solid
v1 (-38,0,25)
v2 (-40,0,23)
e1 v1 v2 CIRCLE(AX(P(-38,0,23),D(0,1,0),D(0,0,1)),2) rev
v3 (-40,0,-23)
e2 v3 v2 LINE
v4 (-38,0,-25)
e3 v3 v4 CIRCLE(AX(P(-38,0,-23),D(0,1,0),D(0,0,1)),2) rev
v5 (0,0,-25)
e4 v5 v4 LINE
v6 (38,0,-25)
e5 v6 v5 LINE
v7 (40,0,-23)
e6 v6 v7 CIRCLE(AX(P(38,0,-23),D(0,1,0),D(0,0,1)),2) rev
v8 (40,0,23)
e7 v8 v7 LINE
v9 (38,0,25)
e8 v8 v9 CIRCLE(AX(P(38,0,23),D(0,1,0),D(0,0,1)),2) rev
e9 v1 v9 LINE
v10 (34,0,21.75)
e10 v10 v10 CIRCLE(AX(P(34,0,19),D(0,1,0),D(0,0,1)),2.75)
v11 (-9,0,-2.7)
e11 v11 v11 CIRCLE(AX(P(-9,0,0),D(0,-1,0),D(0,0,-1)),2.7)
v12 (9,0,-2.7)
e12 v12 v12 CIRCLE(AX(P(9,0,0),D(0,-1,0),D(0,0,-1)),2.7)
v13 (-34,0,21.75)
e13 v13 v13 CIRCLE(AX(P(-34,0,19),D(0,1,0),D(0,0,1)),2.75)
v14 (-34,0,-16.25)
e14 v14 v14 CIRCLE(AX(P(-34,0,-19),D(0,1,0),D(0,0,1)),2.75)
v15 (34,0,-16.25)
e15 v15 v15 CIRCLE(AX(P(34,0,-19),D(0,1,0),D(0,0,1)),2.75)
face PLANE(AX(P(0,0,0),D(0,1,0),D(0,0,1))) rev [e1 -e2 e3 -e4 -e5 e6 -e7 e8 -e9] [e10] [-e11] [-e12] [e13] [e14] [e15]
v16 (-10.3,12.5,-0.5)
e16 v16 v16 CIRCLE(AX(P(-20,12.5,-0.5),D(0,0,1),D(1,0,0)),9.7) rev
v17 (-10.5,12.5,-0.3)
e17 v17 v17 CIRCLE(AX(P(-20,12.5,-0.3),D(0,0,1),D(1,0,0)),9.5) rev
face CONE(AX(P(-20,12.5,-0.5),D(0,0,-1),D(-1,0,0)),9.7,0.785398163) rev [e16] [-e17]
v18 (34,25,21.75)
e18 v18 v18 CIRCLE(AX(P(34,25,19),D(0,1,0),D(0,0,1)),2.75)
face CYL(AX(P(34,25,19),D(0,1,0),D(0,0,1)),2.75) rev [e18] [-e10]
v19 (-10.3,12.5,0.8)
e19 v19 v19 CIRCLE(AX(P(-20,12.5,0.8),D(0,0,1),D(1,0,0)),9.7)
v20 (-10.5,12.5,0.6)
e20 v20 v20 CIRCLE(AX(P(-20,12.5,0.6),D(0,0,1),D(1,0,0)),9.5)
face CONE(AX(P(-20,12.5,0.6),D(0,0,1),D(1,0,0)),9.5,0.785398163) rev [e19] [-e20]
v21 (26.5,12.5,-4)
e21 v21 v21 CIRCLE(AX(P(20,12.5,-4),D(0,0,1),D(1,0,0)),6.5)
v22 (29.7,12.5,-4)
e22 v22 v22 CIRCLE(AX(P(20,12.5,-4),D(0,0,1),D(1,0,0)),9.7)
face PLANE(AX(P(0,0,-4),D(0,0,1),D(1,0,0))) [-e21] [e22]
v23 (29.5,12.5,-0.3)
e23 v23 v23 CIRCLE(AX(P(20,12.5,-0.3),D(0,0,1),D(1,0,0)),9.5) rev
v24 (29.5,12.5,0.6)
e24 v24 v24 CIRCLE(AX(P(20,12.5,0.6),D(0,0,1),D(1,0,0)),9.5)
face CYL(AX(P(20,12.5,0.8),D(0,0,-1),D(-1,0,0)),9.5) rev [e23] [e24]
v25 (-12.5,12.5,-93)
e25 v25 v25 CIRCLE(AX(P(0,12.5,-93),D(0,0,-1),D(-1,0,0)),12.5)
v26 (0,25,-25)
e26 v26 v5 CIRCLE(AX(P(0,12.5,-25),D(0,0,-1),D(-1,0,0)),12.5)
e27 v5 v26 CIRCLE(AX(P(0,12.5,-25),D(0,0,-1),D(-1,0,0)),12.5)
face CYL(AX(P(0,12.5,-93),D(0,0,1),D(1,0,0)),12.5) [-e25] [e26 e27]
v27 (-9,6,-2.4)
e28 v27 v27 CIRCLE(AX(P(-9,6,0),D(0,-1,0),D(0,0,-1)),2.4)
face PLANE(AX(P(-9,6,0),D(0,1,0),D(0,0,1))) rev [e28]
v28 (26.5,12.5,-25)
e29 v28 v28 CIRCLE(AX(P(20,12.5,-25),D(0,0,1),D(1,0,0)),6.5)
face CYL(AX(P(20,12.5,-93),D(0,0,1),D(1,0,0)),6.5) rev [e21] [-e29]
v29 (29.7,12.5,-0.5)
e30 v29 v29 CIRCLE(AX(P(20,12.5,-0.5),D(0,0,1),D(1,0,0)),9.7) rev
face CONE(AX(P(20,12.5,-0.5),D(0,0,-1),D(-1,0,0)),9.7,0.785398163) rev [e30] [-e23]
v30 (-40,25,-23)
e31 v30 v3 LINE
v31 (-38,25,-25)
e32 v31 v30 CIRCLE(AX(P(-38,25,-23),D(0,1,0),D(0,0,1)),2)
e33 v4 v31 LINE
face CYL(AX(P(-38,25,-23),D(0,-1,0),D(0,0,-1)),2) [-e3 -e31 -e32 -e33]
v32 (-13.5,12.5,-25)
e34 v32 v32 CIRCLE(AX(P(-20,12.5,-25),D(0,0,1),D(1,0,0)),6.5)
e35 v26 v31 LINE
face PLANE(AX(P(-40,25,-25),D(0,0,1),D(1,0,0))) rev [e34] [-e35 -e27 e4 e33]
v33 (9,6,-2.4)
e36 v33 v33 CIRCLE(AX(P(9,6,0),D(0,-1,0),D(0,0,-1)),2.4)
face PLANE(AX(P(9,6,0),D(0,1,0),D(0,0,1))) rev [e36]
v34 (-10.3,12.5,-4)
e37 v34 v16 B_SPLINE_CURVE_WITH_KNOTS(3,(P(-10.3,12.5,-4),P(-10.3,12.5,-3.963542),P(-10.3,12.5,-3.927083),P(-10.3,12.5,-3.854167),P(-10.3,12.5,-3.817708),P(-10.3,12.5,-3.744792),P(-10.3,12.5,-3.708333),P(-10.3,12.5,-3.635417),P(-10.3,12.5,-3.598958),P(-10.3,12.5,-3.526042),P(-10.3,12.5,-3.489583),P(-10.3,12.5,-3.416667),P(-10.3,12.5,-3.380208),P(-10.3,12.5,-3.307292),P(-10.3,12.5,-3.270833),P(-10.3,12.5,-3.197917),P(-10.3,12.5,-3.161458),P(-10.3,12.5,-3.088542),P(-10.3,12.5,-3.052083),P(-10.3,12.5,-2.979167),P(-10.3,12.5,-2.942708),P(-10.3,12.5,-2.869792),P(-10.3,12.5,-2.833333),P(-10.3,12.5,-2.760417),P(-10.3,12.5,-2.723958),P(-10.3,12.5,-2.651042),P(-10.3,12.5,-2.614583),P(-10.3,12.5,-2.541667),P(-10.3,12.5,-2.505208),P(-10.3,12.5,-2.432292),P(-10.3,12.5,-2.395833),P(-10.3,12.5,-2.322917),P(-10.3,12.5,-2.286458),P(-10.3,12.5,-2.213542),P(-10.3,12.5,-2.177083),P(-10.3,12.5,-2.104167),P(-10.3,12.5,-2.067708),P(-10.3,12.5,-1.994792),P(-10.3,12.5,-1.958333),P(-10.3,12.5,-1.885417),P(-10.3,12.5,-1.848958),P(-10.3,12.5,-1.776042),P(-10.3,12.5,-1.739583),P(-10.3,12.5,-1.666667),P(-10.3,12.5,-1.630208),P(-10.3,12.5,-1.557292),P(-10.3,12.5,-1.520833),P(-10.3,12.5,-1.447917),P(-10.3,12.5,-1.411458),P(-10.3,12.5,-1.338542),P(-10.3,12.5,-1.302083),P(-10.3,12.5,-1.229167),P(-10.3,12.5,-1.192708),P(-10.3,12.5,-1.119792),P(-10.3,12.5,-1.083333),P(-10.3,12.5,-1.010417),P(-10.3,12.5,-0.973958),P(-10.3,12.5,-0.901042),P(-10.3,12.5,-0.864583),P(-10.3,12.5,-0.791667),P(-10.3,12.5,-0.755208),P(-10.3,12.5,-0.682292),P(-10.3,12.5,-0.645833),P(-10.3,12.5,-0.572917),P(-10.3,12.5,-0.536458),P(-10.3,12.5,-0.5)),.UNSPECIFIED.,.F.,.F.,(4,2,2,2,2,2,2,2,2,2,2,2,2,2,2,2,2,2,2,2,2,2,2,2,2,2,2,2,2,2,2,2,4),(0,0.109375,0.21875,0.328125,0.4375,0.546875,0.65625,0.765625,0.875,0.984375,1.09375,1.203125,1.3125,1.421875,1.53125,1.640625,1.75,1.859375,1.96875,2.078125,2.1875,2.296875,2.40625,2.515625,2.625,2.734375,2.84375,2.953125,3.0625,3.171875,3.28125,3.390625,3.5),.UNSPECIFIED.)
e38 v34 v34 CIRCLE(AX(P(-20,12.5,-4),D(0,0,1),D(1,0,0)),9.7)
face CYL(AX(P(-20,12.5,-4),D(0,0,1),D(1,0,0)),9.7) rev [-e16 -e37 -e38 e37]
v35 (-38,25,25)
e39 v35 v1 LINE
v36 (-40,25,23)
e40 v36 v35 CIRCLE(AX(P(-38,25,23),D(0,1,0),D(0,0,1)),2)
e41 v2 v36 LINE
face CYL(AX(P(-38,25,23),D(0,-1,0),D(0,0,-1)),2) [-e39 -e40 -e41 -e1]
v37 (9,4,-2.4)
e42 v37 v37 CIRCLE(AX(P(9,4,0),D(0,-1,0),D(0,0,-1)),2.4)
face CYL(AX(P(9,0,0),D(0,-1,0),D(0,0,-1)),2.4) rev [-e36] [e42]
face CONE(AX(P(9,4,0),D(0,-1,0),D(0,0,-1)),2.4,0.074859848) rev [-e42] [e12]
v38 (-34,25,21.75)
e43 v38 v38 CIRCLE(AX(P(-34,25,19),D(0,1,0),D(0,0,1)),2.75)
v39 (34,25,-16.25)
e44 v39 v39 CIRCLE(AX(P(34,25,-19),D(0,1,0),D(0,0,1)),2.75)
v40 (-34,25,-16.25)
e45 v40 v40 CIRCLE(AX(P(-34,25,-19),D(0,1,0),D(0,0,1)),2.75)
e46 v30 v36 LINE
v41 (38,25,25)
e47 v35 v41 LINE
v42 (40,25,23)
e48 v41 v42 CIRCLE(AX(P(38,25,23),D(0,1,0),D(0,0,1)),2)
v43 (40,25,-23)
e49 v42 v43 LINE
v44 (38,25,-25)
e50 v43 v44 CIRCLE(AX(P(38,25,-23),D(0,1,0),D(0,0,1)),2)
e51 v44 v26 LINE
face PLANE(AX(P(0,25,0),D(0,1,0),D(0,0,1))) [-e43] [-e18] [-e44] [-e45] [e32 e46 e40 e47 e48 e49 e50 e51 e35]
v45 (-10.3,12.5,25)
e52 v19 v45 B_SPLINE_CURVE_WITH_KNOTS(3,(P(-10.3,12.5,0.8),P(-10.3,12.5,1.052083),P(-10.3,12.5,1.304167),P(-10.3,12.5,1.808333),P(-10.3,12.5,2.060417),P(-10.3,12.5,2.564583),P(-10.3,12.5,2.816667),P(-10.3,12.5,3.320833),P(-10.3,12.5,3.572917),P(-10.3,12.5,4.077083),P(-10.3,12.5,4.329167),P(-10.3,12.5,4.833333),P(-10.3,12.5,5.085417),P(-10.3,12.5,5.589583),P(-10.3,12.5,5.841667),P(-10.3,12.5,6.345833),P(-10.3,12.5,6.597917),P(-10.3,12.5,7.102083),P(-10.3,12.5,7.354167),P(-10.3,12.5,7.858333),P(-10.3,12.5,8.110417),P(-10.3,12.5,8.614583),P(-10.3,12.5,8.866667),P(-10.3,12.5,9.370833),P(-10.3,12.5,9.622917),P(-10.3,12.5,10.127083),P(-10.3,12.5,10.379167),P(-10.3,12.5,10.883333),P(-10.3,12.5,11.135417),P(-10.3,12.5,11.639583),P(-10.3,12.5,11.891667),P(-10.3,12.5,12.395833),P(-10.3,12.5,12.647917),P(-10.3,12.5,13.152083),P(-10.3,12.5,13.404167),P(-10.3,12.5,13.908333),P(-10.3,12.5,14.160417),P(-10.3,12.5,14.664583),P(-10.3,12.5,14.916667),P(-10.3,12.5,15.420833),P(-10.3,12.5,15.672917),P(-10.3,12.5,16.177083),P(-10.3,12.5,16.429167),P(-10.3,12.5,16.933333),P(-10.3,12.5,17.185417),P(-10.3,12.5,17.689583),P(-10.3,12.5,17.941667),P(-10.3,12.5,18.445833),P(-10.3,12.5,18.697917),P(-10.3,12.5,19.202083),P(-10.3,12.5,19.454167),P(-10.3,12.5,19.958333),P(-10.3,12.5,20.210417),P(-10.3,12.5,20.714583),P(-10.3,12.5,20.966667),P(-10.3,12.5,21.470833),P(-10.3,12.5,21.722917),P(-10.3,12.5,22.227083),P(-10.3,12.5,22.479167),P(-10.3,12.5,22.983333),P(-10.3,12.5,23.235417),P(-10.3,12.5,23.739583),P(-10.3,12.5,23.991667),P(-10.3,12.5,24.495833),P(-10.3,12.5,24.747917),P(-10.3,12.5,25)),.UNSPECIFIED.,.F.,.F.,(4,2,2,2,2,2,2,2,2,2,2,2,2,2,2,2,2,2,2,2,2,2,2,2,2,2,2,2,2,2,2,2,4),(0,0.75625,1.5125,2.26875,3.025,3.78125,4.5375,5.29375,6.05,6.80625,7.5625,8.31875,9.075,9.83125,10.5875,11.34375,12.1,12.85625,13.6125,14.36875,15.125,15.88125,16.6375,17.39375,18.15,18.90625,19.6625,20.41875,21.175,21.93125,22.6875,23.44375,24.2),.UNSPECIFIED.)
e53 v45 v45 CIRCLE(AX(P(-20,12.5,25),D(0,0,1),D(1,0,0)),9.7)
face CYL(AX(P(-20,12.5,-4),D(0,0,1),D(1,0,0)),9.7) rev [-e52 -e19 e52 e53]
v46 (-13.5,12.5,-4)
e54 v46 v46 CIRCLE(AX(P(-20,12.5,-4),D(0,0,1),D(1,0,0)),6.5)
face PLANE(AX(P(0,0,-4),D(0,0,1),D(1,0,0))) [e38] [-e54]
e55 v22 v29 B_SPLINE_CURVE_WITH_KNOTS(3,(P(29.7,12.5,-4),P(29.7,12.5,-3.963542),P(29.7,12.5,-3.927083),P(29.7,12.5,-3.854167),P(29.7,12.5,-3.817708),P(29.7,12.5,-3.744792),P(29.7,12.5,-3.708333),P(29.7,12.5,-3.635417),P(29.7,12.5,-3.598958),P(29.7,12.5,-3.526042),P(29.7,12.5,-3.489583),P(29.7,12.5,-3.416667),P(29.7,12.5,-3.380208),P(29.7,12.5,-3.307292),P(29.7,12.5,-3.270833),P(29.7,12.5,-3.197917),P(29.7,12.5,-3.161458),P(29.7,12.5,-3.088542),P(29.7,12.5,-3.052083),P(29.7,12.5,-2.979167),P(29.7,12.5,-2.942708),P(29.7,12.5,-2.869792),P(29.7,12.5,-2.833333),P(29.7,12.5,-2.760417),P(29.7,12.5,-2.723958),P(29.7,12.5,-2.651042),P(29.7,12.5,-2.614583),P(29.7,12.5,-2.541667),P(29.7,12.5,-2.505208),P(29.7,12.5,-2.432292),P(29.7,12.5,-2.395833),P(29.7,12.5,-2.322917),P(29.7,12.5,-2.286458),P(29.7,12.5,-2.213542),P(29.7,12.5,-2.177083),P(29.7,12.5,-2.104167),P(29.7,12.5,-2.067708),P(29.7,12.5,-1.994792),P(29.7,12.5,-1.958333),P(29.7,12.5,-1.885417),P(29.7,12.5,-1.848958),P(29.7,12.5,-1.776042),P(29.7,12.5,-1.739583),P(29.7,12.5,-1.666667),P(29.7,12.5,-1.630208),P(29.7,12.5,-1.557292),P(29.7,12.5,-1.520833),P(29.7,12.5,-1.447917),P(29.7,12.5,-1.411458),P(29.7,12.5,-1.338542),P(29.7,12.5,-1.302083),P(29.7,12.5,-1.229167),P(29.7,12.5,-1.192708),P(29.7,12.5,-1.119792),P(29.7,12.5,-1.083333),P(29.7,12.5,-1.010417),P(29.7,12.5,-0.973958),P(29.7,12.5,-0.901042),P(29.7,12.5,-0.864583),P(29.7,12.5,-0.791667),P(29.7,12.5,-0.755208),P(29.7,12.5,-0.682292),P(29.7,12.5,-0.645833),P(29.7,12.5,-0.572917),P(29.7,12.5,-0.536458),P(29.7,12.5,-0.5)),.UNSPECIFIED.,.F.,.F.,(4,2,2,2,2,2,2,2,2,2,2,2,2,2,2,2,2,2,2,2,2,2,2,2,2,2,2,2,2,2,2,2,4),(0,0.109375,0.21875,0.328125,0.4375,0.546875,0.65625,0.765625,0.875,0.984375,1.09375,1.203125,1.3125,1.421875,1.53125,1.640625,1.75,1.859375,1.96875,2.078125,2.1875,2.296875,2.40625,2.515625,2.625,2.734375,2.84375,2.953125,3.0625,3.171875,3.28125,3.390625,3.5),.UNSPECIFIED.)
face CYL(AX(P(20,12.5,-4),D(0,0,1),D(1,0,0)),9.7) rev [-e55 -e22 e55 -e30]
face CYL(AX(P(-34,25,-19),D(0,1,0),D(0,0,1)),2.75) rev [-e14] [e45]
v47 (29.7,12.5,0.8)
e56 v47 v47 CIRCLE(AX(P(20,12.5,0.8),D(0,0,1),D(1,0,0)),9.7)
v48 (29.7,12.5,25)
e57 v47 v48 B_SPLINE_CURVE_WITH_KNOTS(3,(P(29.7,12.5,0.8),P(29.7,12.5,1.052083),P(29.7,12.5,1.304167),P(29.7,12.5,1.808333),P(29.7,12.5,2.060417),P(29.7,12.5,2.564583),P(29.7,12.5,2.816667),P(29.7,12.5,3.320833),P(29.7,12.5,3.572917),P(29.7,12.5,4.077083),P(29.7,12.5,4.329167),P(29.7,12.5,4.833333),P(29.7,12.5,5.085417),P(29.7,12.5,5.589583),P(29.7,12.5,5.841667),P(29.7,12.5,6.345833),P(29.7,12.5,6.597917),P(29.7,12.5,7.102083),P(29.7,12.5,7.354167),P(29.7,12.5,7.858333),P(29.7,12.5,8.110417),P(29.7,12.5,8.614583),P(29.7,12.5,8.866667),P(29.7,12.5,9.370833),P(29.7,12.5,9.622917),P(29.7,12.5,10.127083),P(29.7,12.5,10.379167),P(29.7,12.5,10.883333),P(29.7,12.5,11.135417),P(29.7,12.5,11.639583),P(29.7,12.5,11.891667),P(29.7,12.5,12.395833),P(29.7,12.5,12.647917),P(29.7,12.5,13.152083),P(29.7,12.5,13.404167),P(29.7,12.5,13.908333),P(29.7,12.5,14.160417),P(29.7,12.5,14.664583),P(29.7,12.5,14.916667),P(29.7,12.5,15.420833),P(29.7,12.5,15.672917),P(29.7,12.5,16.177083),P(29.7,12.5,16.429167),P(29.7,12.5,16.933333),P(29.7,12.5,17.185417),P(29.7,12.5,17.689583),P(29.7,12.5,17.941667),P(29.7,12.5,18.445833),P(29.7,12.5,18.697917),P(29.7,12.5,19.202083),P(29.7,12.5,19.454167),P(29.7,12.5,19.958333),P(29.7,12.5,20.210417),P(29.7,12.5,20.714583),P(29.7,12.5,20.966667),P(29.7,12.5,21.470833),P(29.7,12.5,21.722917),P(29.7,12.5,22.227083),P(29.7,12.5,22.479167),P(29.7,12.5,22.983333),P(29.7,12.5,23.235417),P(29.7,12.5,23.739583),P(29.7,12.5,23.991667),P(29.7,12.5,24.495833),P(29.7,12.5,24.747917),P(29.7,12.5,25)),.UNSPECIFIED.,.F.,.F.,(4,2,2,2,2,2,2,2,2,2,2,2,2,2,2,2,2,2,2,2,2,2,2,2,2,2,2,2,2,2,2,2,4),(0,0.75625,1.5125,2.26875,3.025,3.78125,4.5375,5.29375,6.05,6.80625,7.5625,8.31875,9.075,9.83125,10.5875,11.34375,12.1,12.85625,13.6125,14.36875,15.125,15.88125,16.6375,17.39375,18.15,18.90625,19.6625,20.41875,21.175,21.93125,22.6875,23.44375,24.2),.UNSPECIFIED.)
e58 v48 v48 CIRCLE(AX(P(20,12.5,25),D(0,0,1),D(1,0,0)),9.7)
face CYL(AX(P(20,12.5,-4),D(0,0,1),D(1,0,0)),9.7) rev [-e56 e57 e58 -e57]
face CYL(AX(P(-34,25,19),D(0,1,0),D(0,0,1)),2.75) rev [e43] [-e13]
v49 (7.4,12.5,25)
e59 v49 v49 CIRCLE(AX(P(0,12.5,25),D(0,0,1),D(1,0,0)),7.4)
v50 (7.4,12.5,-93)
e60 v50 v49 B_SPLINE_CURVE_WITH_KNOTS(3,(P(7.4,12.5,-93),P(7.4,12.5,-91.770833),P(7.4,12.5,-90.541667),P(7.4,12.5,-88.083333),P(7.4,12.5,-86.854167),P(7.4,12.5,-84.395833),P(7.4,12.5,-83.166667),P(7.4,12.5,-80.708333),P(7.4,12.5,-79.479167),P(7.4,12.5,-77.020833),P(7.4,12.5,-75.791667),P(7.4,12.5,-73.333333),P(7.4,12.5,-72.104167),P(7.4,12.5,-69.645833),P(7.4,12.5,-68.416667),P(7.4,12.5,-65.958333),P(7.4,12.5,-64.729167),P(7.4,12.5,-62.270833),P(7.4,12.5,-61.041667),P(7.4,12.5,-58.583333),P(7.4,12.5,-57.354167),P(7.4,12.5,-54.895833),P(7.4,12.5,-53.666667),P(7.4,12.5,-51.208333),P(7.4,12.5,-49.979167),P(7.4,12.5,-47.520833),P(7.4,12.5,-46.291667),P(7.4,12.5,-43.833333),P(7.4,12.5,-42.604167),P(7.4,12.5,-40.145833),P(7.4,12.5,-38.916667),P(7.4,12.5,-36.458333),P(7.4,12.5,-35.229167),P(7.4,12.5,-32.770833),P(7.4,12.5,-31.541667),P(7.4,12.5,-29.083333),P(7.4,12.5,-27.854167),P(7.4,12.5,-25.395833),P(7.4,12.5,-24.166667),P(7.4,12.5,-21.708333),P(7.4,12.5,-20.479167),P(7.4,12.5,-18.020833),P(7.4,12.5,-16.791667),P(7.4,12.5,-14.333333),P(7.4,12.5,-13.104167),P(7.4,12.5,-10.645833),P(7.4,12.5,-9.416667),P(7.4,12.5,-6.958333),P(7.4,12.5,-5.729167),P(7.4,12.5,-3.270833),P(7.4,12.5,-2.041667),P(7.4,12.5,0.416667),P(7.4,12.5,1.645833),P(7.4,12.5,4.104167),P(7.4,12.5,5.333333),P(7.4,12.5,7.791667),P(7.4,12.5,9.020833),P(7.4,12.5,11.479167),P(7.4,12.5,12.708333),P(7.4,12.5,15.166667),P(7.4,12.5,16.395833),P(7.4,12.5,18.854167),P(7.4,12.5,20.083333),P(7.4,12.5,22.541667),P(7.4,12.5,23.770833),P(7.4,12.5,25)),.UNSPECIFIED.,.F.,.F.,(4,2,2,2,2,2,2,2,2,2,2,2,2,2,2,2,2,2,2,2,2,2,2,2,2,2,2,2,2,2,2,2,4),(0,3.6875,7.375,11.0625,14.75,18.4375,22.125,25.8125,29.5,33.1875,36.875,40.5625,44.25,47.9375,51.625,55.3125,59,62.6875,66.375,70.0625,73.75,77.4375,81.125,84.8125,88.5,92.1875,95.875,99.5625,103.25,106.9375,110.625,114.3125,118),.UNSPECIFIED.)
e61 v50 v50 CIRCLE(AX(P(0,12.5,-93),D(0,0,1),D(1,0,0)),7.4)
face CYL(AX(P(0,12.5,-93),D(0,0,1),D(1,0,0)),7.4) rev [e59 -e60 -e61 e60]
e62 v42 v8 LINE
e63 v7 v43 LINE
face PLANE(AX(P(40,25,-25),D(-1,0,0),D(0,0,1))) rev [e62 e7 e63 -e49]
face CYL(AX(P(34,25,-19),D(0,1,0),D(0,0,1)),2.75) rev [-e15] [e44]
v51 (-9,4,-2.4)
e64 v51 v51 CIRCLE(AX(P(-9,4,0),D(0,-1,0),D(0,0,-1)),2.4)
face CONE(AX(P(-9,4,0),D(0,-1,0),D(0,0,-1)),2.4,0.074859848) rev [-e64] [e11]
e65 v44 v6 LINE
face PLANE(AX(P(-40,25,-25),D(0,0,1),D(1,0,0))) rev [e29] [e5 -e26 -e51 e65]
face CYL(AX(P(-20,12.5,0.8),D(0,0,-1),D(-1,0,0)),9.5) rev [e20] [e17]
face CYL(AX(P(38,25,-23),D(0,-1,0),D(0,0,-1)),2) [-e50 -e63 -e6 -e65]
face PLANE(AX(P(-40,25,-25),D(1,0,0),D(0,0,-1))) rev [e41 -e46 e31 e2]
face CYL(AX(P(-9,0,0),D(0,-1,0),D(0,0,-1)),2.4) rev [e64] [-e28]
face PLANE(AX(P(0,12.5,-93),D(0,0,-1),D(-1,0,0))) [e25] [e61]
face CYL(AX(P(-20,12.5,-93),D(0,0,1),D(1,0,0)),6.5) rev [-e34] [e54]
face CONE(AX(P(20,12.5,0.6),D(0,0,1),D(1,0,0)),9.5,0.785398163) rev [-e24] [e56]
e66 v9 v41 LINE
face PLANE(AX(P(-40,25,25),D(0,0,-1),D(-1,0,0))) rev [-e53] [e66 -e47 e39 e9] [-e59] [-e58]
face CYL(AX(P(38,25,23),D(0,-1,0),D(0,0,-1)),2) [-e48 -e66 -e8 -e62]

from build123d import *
from OCP.BRepFilletAPI import BRepFilletAPI_MakeChamfer

# Parameters (mm, degrees)
SKETCH1_W            = 80
SKETCH1_H            = 50
BOSS_EXTRUDE1_DEPTH  = 25
M5_CLEARANCE_HOLE1_D = 5.5
SKETCH5_R            = 12.5
SKETCH5_R_2          = 6.985
BOSS_EXTRUDE2_DEPTH  = 68
SKETCH4_R            = 9.7
CUT_EXTRUDE2_DEPTH   = 29
SKETCH4_4_R          = 7.4
CUT_EXTRUDE3_DEPTH   = 128.078715763
SKETCH6_R            = 6.5
CUT_EXTRUDE4_DEPTH   = 101.727354775
BOSS_EXTRUDE3_START  = 1.3
SKETCH7_R            = 9.7
SKETCH7_R_2          = 9.5
BOSS_EXTRUDE3_DEPTH  = 1.3
CHAMFER2_SIZE        = 0.2
HOLE2_D              = 4.8
HOLE2_DEPTH          = 6
HOLE2_CBORE_D        = 5.4
HOLE2_CBORE_DEPTH    = 4
CHAMFER3_SIZE        = 4
CHAMFER3_SIZE_2      = 0.3
FILLET1_R            = 2


with BuildPart() as part:
    # Sketch1 → Boss-Extrude1 (new body)
    with BuildSketch(Plane(origin=(0, 0, 0), x_dir=(1, 0, 0), z_dir=(0, 1, 0))):
        Rectangle(SKETCH1_W, SKETCH1_H)
    extrude(amount=BOSS_EXTRUDE1_DEPTH)

    # M5 Clearance Hole1 (through all)
    with Locations(Plane(origin=(0, 25, 0), x_dir=(1, 0, 0), z_dir=(0, 1, 0))):
        with Locations((-34, 19), (34, 19), (34, -19), (-34, -19)):
            Hole(M5_CLEARANCE_HOLE1_D / 2)

    # Sketch5 → Boss-Extrude2 (add)
    with BuildSketch(Plane(origin=(0, 0, -25), x_dir=(-1, 0, 0), z_dir=(0, 0, -1))):
        with Locations(Location((0, 12.5, 0), (0, 0, 270))):
            Circle(SKETCH5_R)
        with Locations((0, 12.5)):
            Circle(SKETCH5_R_2, mode=Mode.SUBTRACT)
    extrude(amount=BOSS_EXTRUDE2_DEPTH)

    # Sketch4 → Cut-Extrude2 (cut)
    with BuildSketch(Plane.XY.offset(25)):
        with Locations((-20, 12.5)):
            Circle(SKETCH4_R)
        with Locations((20, 12.5)):
            Circle(SKETCH4_R)
    extrude(amount=-CUT_EXTRUDE2_DEPTH, mode=Mode.SUBTRACT)

    # Sketch4<4> → Cut-Extrude3 (cut, through all)
    with BuildSketch(Plane.XY.offset(25)):
        with Locations((0, 12.5)):
            Circle(SKETCH4_4_R)
    extrude(amount=-CUT_EXTRUDE3_DEPTH, mode=Mode.SUBTRACT)

    # Sketch6 → Cut-Extrude4 (cut, through all)
    with BuildSketch(Plane.XY.offset(-4)):
        with Locations((-20, 12.5)):
            Circle(SKETCH6_R)
        with Locations((20, 12.5)):
            Circle(SKETCH6_R)
    extrude(amount=-CUT_EXTRUDE4_DEPTH, mode=Mode.SUBTRACT)

    # Sketch7 → Boss-Extrude3 (add)
    # profile 1 of 2: a face of its own
    with BuildSketch(Plane.XY.offset(-0.5).offset(BOSS_EXTRUDE3_START)):
        with Locations((-20, 12.5)):
            Circle(SKETCH7_R)
        with Locations((-20, 12.5)):
            Circle(SKETCH7_R_2, mode=Mode.SUBTRACT)
    # profile 2 of 2: a face of its own
    with BuildSketch(Plane.XY.offset(-0.5).offset(BOSS_EXTRUDE3_START)):
        with Locations((20, 12.5)):
            Circle(SKETCH7_R)
        with Locations((20, 12.5)):
            Circle(SKETCH7_R_2, mode=Mode.SUBTRACT)
    extrude(amount=-BOSS_EXTRUDE3_DEPTH)

    # Chamfer2
    chamfer2_edges = [part.edges().sort_by_distance(p)[0] for p in [
        (-29.5, 12.5, -0.5),
        (-29.5, 12.5, 0.8),
        (10.5, 12.5, -0.5),
        (10.5, 12.5, 0.8),
    ]]
    chamfer(chamfer2_edges, length=CHAMFER2_SIZE - 0.0001)  # a hair under: the kernel refuses the full size

    # Hole2
    with Locations(Plane(origin=(0, 0, 0), x_dir=(-1, 0, 0), z_dir=(0, -1, 0))):
        with Locations((-9, 0), (9, 0)):
            CounterBoreHole(HOLE2_D / 2, HOLE2_CBORE_D / 2, HOLE2_CBORE_DEPTH, depth=HOLE2_DEPTH)

    # Chamfer3
    chamfer3_edges_1 = [part.edges().sort_by_distance(p)[0] for p in [
        (-6.3, 4, 0),
    ]]
    chamfer3_side_1 = [part.faces().sort_by_distance(p)[0] for p in [
        (-6.3, 3.994, 0),
    ]]
    chamfer3_edges_2 = [part.edges().sort_by_distance(p)[0] for p in [
        (11.7, 4, 0),
    ]]
    chamfer3_side_2 = [part.faces().sort_by_distance(p)[0] for p in [
        (11.7, 3.994, 0),
    ]]
    chamfer3 = BRepFilletAPI_MakeChamfer(part.part.solid().wrapped)
    for e in chamfer3_edges_1:
        chamfer3.Add(CHAMFER3_SIZE - 0.0001, CHAMFER3_SIZE_2 - 0.0001, e.wrapped, chamfer3_side_1[0].wrapped)
    for e in chamfer3_edges_2:
        chamfer3.Add(CHAMFER3_SIZE - 0.0001, CHAMFER3_SIZE_2 - 0.0001, e.wrapped, chamfer3_side_2[0].wrapped)
    add(Compound.cast(chamfer3.Shape()), mode=Mode.REPLACE)  # a hair under: the kernel refuses the full size

    # Fillet1
    fillet1_edges = [part.edges().sort_by_distance(p)[0] for p in [
        (40, 12.5, 25),
        (-40, 12.5, 25),
        (-40, 12.5, -25),
        (40, 12.5, -25),
    ]]
    fillet(fillet1_edges, radius=FILLET1_R)


solid = part.part
